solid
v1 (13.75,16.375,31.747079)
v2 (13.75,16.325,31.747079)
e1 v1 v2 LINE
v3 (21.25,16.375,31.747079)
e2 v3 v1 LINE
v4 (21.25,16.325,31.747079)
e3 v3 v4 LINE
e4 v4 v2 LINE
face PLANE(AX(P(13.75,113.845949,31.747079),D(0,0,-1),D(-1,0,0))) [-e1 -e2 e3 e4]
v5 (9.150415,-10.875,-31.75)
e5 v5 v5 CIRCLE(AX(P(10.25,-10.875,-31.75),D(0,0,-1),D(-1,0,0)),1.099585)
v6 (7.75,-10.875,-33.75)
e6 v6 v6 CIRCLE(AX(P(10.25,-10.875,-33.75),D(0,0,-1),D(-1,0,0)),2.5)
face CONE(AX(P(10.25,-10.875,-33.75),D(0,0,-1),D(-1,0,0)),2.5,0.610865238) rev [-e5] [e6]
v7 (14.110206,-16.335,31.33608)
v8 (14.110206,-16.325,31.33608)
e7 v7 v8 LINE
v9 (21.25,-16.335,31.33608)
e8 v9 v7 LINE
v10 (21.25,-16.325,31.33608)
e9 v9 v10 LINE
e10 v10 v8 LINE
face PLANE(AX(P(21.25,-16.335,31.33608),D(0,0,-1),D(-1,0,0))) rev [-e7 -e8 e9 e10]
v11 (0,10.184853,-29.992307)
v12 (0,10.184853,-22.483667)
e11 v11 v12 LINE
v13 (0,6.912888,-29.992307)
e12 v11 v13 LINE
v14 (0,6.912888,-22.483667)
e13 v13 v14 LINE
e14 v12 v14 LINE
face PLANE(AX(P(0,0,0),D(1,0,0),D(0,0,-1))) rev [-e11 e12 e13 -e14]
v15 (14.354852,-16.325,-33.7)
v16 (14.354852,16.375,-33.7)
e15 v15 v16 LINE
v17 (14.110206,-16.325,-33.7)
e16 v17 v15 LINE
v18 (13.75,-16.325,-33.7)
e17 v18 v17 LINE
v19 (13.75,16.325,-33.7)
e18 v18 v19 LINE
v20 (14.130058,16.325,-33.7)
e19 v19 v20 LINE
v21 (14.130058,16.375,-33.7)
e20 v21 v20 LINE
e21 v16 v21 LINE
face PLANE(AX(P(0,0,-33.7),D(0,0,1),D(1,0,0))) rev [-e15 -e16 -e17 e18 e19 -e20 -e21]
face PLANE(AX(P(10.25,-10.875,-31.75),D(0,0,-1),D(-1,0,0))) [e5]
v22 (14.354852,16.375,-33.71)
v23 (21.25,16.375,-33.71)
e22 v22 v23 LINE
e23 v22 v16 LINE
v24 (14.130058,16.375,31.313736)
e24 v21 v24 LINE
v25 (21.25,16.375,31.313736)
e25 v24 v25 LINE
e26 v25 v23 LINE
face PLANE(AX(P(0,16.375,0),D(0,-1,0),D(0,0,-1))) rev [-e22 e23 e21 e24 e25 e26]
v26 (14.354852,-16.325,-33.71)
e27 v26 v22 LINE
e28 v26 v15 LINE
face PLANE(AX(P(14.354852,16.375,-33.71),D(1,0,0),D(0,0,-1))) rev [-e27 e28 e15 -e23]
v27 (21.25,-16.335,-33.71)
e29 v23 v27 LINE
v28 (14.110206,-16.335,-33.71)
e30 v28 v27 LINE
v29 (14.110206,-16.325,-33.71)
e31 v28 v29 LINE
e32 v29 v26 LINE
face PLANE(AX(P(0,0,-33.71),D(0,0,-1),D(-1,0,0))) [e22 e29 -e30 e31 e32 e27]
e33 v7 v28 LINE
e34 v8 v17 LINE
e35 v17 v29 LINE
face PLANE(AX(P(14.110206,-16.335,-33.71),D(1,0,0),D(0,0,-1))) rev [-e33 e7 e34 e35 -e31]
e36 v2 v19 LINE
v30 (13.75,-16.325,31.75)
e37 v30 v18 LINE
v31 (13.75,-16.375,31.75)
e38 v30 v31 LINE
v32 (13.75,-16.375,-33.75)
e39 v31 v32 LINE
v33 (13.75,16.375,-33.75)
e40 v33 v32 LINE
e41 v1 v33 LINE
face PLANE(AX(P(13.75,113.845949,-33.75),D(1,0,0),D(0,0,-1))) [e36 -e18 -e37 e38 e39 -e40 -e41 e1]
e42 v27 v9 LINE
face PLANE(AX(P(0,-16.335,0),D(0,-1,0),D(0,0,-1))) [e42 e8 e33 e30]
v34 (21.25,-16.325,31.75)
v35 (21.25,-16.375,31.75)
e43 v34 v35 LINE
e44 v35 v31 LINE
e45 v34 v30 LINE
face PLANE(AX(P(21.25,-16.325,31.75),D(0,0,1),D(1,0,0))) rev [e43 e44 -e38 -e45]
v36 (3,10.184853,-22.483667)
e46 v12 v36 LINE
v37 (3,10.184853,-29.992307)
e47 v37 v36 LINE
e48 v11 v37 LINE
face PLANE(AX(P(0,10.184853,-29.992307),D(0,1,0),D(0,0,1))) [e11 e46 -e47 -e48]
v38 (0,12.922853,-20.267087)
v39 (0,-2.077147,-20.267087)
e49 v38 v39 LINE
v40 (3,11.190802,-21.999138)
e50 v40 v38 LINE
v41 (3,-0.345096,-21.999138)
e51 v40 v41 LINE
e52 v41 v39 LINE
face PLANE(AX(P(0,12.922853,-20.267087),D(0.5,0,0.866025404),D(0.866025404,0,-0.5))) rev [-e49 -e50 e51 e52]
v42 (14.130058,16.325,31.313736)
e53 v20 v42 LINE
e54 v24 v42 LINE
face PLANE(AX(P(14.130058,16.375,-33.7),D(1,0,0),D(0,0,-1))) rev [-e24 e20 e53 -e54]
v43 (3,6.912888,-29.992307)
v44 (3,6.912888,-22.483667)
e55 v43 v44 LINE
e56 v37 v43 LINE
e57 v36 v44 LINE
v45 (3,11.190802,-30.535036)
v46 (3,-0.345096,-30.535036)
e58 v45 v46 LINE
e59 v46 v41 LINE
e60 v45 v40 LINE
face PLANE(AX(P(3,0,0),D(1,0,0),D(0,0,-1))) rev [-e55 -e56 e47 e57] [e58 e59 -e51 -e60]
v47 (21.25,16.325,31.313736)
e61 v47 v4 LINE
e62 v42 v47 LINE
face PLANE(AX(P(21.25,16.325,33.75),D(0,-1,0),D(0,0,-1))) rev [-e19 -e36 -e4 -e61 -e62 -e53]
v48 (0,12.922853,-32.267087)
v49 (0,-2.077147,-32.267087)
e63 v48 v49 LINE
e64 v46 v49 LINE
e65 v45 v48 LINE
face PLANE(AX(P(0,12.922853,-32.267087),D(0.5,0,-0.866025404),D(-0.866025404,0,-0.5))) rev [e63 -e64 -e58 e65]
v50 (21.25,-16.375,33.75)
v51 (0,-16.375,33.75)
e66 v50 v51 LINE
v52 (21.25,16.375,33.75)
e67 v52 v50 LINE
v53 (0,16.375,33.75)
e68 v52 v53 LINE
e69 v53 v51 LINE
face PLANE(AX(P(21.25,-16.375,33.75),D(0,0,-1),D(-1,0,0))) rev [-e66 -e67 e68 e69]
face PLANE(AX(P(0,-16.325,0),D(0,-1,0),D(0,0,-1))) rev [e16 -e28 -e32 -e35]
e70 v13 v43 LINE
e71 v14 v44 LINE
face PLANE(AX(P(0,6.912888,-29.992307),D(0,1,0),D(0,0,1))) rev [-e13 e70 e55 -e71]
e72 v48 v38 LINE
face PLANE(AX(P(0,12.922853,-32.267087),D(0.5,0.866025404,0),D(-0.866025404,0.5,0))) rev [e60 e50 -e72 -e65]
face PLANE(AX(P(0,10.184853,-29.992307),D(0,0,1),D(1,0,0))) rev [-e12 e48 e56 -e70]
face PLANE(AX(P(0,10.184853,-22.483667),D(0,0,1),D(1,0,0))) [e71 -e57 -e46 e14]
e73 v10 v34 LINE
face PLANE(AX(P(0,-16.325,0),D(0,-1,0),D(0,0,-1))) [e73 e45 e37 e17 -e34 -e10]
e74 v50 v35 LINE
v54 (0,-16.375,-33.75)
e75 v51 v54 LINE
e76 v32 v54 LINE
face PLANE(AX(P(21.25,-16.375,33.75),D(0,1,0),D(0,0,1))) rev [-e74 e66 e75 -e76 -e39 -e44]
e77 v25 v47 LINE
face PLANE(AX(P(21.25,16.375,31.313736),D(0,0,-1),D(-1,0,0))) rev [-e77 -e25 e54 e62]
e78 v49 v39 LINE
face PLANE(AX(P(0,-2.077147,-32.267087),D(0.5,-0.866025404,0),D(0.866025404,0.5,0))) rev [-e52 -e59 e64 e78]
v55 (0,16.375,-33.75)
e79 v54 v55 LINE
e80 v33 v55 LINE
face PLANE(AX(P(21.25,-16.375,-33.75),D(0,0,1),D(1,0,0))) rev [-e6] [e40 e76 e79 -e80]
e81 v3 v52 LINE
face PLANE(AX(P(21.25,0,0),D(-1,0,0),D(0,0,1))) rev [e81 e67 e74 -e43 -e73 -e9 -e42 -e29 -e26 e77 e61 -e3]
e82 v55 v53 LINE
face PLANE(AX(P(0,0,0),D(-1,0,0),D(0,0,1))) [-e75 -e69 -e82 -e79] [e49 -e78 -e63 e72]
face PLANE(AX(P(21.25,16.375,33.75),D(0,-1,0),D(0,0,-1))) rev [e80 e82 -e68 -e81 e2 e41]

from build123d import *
from build123d.topology import SkipClean

# Parameters (mm, degrees)
SKETCH2_W               = 67.5
SKETCH2_H               = 32.75
BOSS_EXTRUDE1_DEPTH     = 21.25
CUT_EXTRUDE3_DEPTH      = 52.606080068
CUT_EXTRUDE3_DEPTH_BACK = 0.05
SKETCH4_W               = 7.5
SKETCH4_H               = 32.7
CUT_EXTRUDE6_DEPTH      = 0.05
SKETCH5_W               = 7.5
SKETCH5_H               = 65.45
CUT_EXTRUDE7_DEPTH      = 0.05
SKETCH6_W               = 7.119941604
SKETCH6_H               = 65.013736252
BOSS_EXTRUDE9_DEPTH     = 0.05
SKETCH15_W              = 6.895148233
SKETCH15_H              = 32.7
BOSS_EXTRUDE14_DEPTH    = 0.01
SKETCH16_W              = 7.139794156
SKETCH16_H              = 65.046080354
BOSS_EXTRUDE15_DEPTH    = 0.01
SKETCH18_W              = 12
SKETCH18_H              = 15
CUT_EXTRUDE14_DEPTH     = 3
CUT_EXTRUDE14_DRAFT     = -30
SKETCH19_W              = 7.508639757
SKETCH19_H              = 3.271964709
BOSS_EXTRUDE16_DEPTH    = 3
SKETCH21_R              = 2.5
CUT_EXTRUDE17_DEPTH     = 2
CUT_EXTRUDE17_DRAFT     = -35


with BuildPart() as part:
    # Sketch2 → Boss-Extrude1 (new body)
    with BuildSketch(Plane(origin=(0, 0, 0), x_dir=(0, 0, -1), z_dir=(1, 0, 0))):
        Rectangle(SKETCH2_W, SKETCH2_H)
    extrude(amount=BOSS_EXTRUDE1_DEPTH)

    # Sketch3 → Cut-Extrude3 (cut, two sides: drawn at the far end of the back side and taken through both)
    with SkipClean():  # the faces are left unmerged after this step: merging them gives an invalid solid
        with BuildSketch(Plane(origin=(0, 16.375, 0), x_dir=(1, 0, 0), z_dir=(0, 1, 0)).offset(-CUT_EXTRUDE3_DEPTH_BACK)):
            with BuildLine():
                Line((-134.022457335, 33.75), (13.75, 33.75))
                Line((13.75, 33.75), (13.751, 33.75))
                Line((13.75, 33.75), (13.75, -31.747079321))
                Line((13.75, -31.747079321), (21.25, -31.747079321))
                Line((21.25, -31.747079321), (169.022457335, -31.747079321))
                Line((169.022457335, -31.747079321), (231.45697941, 257.127853894))
                Line((231.45697941, 257.127853894), (-71.58793526, 322.624933215))
                Line((-71.58793526, 322.624933215), (-134.022457335, 33.75))
            make_face()
        extrude(amount=CUT_EXTRUDE3_DEPTH + CUT_EXTRUDE3_DEPTH_BACK, mode=Mode.SUBTRACT)
    add(part.part.scale(1), mode=Mode.REPLACE)  # the faces are merged on a copy

    # Sketch4 → Cut-Extrude6 (cut)
    with BuildSketch(Plane(origin=(0, 0, -33.75), x_dir=(-1, 0, 0), z_dir=(0, 0, -1))):
        with Locations((-17.5, -0.025)):
            Rectangle(SKETCH4_W, SKETCH4_H)
    extrude(amount=-CUT_EXTRUDE6_DEPTH, mode=Mode.SUBTRACT)

    # Sketch5 → Cut-Extrude7 (cut)
    with BuildSketch(Plane(origin=(0, -16.375, 0), x_dir=(-1, 0, 0), z_dir=(0, -1, 0))):
        with Locations((-17.5, 0.975)):
            Rectangle(SKETCH5_W, SKETCH5_H)
    extrude(amount=-CUT_EXTRUDE7_DEPTH, mode=Mode.SUBTRACT)

    # Sketch6 → Boss-Extrude9 (add)
    with BuildSketch(Plane(origin=(0, 16.325, 0), x_dir=(1, 0, 0), z_dir=(0, 1, 0))):
        with Locations((17.690029198, 1.193131874)):
            Rectangle(SKETCH6_W, SKETCH6_H)
    extrude(amount=BOSS_EXTRUDE9_DEPTH)

    # Sketch15 → Boss-Extrude14 (add)
    with BuildSketch(Plane(origin=(0, 0, -33.7), x_dir=(-1, 0, 0), z_dir=(0, 0, -1))):
        with Locations((-17.802425883, 0.025)):
            Rectangle(SKETCH15_W, SKETCH15_H)
    extrude(amount=BOSS_EXTRUDE14_DEPTH)

    # Sketch16 → Boss-Extrude15 (add)
    with BuildSketch(Plane(origin=(0, -16.325, 0), x_dir=(-1, 0, 0), z_dir=(0, -1, 0))):
        with Locations((-17.680102922, 1.186959823)):
            Rectangle(SKETCH16_W, SKETCH16_H)
    extrude(amount=BOSS_EXTRUDE15_DEPTH)


with BuildPart() as cut_extrude14_tool:
    # Sketch18 → Cut-Extrude14 (with draft: the straight prism first)
    with BuildSketch(Plane.ZY):
        with Locations((-26.267087013, 5.422853248)):
            Rectangle(SKETCH18_W, SKETCH18_H)
    extrude(amount=-CUT_EXTRUDE14_DEPTH)
    # Cut-Extrude14: the draft: its side faces are tilted about the plane it starts from
    cut_extrude14_sides = [cut_extrude14_tool.faces().sort_by_distance(p)[0] for p in [
        (1.5, 5.422853248, -32.267087013),
        (1.5, -2.077146752, -26.267087013),
        (1.5, 5.422853248, -20.267087013),
        (1.5, 12.922853248, -26.267087013),
    ]]
    draft(cut_extrude14_sides, Plane.ZY, CUT_EXTRUDE14_DRAFT)


with BuildPart() as part_1:
    add(part.part)

    # Cut-Extrude14: cut by cut_extrude14_tool
    add(cut_extrude14_tool.part, mode=Mode.SUBTRACT)

    # Sketch19 → Boss-Extrude16 (add)
    with BuildSketch(Plane.ZY.offset(-3)):
        with Locations((-26.237986877, 8.548870353)):
            Rectangle(SKETCH19_W, SKETCH19_H)
    extrude(amount=BOSS_EXTRUDE16_DEPTH)


with BuildPart() as cut_extrude17_tool:
    # Sketch21 → Cut-Extrude17 (with draft: the straight prism first)
    with BuildSketch(Plane(origin=(0, 0, -33.75), x_dir=(-1, 0, 0), z_dir=(0, 0, -1))):
        with Locations((-10.25, -10.875)):
            Circle(SKETCH21_R)
    extrude(amount=-CUT_EXTRUDE17_DEPTH)
    # Cut-Extrude17: the draft: its side faces are tilted about the plane it starts from
    cut_extrude17_sides = [cut_extrude17_tool.faces().sort_by_distance(p)[0] for p in [
        (12.75, -10.875, -32.75),
    ]]
    draft(cut_extrude17_sides, Plane(origin=(0, 0, -33.75), x_dir=(-1, 0, 0), z_dir=(0, 0, -1)), CUT_EXTRUDE17_DRAFT)


with BuildPart() as part_2:
    add(part_1.part)

    # Cut-Extrude17: cut by cut_extrude17_tool
    add(cut_extrude17_tool.part, mode=Mode.SUBTRACT)


solid = part_2.part
